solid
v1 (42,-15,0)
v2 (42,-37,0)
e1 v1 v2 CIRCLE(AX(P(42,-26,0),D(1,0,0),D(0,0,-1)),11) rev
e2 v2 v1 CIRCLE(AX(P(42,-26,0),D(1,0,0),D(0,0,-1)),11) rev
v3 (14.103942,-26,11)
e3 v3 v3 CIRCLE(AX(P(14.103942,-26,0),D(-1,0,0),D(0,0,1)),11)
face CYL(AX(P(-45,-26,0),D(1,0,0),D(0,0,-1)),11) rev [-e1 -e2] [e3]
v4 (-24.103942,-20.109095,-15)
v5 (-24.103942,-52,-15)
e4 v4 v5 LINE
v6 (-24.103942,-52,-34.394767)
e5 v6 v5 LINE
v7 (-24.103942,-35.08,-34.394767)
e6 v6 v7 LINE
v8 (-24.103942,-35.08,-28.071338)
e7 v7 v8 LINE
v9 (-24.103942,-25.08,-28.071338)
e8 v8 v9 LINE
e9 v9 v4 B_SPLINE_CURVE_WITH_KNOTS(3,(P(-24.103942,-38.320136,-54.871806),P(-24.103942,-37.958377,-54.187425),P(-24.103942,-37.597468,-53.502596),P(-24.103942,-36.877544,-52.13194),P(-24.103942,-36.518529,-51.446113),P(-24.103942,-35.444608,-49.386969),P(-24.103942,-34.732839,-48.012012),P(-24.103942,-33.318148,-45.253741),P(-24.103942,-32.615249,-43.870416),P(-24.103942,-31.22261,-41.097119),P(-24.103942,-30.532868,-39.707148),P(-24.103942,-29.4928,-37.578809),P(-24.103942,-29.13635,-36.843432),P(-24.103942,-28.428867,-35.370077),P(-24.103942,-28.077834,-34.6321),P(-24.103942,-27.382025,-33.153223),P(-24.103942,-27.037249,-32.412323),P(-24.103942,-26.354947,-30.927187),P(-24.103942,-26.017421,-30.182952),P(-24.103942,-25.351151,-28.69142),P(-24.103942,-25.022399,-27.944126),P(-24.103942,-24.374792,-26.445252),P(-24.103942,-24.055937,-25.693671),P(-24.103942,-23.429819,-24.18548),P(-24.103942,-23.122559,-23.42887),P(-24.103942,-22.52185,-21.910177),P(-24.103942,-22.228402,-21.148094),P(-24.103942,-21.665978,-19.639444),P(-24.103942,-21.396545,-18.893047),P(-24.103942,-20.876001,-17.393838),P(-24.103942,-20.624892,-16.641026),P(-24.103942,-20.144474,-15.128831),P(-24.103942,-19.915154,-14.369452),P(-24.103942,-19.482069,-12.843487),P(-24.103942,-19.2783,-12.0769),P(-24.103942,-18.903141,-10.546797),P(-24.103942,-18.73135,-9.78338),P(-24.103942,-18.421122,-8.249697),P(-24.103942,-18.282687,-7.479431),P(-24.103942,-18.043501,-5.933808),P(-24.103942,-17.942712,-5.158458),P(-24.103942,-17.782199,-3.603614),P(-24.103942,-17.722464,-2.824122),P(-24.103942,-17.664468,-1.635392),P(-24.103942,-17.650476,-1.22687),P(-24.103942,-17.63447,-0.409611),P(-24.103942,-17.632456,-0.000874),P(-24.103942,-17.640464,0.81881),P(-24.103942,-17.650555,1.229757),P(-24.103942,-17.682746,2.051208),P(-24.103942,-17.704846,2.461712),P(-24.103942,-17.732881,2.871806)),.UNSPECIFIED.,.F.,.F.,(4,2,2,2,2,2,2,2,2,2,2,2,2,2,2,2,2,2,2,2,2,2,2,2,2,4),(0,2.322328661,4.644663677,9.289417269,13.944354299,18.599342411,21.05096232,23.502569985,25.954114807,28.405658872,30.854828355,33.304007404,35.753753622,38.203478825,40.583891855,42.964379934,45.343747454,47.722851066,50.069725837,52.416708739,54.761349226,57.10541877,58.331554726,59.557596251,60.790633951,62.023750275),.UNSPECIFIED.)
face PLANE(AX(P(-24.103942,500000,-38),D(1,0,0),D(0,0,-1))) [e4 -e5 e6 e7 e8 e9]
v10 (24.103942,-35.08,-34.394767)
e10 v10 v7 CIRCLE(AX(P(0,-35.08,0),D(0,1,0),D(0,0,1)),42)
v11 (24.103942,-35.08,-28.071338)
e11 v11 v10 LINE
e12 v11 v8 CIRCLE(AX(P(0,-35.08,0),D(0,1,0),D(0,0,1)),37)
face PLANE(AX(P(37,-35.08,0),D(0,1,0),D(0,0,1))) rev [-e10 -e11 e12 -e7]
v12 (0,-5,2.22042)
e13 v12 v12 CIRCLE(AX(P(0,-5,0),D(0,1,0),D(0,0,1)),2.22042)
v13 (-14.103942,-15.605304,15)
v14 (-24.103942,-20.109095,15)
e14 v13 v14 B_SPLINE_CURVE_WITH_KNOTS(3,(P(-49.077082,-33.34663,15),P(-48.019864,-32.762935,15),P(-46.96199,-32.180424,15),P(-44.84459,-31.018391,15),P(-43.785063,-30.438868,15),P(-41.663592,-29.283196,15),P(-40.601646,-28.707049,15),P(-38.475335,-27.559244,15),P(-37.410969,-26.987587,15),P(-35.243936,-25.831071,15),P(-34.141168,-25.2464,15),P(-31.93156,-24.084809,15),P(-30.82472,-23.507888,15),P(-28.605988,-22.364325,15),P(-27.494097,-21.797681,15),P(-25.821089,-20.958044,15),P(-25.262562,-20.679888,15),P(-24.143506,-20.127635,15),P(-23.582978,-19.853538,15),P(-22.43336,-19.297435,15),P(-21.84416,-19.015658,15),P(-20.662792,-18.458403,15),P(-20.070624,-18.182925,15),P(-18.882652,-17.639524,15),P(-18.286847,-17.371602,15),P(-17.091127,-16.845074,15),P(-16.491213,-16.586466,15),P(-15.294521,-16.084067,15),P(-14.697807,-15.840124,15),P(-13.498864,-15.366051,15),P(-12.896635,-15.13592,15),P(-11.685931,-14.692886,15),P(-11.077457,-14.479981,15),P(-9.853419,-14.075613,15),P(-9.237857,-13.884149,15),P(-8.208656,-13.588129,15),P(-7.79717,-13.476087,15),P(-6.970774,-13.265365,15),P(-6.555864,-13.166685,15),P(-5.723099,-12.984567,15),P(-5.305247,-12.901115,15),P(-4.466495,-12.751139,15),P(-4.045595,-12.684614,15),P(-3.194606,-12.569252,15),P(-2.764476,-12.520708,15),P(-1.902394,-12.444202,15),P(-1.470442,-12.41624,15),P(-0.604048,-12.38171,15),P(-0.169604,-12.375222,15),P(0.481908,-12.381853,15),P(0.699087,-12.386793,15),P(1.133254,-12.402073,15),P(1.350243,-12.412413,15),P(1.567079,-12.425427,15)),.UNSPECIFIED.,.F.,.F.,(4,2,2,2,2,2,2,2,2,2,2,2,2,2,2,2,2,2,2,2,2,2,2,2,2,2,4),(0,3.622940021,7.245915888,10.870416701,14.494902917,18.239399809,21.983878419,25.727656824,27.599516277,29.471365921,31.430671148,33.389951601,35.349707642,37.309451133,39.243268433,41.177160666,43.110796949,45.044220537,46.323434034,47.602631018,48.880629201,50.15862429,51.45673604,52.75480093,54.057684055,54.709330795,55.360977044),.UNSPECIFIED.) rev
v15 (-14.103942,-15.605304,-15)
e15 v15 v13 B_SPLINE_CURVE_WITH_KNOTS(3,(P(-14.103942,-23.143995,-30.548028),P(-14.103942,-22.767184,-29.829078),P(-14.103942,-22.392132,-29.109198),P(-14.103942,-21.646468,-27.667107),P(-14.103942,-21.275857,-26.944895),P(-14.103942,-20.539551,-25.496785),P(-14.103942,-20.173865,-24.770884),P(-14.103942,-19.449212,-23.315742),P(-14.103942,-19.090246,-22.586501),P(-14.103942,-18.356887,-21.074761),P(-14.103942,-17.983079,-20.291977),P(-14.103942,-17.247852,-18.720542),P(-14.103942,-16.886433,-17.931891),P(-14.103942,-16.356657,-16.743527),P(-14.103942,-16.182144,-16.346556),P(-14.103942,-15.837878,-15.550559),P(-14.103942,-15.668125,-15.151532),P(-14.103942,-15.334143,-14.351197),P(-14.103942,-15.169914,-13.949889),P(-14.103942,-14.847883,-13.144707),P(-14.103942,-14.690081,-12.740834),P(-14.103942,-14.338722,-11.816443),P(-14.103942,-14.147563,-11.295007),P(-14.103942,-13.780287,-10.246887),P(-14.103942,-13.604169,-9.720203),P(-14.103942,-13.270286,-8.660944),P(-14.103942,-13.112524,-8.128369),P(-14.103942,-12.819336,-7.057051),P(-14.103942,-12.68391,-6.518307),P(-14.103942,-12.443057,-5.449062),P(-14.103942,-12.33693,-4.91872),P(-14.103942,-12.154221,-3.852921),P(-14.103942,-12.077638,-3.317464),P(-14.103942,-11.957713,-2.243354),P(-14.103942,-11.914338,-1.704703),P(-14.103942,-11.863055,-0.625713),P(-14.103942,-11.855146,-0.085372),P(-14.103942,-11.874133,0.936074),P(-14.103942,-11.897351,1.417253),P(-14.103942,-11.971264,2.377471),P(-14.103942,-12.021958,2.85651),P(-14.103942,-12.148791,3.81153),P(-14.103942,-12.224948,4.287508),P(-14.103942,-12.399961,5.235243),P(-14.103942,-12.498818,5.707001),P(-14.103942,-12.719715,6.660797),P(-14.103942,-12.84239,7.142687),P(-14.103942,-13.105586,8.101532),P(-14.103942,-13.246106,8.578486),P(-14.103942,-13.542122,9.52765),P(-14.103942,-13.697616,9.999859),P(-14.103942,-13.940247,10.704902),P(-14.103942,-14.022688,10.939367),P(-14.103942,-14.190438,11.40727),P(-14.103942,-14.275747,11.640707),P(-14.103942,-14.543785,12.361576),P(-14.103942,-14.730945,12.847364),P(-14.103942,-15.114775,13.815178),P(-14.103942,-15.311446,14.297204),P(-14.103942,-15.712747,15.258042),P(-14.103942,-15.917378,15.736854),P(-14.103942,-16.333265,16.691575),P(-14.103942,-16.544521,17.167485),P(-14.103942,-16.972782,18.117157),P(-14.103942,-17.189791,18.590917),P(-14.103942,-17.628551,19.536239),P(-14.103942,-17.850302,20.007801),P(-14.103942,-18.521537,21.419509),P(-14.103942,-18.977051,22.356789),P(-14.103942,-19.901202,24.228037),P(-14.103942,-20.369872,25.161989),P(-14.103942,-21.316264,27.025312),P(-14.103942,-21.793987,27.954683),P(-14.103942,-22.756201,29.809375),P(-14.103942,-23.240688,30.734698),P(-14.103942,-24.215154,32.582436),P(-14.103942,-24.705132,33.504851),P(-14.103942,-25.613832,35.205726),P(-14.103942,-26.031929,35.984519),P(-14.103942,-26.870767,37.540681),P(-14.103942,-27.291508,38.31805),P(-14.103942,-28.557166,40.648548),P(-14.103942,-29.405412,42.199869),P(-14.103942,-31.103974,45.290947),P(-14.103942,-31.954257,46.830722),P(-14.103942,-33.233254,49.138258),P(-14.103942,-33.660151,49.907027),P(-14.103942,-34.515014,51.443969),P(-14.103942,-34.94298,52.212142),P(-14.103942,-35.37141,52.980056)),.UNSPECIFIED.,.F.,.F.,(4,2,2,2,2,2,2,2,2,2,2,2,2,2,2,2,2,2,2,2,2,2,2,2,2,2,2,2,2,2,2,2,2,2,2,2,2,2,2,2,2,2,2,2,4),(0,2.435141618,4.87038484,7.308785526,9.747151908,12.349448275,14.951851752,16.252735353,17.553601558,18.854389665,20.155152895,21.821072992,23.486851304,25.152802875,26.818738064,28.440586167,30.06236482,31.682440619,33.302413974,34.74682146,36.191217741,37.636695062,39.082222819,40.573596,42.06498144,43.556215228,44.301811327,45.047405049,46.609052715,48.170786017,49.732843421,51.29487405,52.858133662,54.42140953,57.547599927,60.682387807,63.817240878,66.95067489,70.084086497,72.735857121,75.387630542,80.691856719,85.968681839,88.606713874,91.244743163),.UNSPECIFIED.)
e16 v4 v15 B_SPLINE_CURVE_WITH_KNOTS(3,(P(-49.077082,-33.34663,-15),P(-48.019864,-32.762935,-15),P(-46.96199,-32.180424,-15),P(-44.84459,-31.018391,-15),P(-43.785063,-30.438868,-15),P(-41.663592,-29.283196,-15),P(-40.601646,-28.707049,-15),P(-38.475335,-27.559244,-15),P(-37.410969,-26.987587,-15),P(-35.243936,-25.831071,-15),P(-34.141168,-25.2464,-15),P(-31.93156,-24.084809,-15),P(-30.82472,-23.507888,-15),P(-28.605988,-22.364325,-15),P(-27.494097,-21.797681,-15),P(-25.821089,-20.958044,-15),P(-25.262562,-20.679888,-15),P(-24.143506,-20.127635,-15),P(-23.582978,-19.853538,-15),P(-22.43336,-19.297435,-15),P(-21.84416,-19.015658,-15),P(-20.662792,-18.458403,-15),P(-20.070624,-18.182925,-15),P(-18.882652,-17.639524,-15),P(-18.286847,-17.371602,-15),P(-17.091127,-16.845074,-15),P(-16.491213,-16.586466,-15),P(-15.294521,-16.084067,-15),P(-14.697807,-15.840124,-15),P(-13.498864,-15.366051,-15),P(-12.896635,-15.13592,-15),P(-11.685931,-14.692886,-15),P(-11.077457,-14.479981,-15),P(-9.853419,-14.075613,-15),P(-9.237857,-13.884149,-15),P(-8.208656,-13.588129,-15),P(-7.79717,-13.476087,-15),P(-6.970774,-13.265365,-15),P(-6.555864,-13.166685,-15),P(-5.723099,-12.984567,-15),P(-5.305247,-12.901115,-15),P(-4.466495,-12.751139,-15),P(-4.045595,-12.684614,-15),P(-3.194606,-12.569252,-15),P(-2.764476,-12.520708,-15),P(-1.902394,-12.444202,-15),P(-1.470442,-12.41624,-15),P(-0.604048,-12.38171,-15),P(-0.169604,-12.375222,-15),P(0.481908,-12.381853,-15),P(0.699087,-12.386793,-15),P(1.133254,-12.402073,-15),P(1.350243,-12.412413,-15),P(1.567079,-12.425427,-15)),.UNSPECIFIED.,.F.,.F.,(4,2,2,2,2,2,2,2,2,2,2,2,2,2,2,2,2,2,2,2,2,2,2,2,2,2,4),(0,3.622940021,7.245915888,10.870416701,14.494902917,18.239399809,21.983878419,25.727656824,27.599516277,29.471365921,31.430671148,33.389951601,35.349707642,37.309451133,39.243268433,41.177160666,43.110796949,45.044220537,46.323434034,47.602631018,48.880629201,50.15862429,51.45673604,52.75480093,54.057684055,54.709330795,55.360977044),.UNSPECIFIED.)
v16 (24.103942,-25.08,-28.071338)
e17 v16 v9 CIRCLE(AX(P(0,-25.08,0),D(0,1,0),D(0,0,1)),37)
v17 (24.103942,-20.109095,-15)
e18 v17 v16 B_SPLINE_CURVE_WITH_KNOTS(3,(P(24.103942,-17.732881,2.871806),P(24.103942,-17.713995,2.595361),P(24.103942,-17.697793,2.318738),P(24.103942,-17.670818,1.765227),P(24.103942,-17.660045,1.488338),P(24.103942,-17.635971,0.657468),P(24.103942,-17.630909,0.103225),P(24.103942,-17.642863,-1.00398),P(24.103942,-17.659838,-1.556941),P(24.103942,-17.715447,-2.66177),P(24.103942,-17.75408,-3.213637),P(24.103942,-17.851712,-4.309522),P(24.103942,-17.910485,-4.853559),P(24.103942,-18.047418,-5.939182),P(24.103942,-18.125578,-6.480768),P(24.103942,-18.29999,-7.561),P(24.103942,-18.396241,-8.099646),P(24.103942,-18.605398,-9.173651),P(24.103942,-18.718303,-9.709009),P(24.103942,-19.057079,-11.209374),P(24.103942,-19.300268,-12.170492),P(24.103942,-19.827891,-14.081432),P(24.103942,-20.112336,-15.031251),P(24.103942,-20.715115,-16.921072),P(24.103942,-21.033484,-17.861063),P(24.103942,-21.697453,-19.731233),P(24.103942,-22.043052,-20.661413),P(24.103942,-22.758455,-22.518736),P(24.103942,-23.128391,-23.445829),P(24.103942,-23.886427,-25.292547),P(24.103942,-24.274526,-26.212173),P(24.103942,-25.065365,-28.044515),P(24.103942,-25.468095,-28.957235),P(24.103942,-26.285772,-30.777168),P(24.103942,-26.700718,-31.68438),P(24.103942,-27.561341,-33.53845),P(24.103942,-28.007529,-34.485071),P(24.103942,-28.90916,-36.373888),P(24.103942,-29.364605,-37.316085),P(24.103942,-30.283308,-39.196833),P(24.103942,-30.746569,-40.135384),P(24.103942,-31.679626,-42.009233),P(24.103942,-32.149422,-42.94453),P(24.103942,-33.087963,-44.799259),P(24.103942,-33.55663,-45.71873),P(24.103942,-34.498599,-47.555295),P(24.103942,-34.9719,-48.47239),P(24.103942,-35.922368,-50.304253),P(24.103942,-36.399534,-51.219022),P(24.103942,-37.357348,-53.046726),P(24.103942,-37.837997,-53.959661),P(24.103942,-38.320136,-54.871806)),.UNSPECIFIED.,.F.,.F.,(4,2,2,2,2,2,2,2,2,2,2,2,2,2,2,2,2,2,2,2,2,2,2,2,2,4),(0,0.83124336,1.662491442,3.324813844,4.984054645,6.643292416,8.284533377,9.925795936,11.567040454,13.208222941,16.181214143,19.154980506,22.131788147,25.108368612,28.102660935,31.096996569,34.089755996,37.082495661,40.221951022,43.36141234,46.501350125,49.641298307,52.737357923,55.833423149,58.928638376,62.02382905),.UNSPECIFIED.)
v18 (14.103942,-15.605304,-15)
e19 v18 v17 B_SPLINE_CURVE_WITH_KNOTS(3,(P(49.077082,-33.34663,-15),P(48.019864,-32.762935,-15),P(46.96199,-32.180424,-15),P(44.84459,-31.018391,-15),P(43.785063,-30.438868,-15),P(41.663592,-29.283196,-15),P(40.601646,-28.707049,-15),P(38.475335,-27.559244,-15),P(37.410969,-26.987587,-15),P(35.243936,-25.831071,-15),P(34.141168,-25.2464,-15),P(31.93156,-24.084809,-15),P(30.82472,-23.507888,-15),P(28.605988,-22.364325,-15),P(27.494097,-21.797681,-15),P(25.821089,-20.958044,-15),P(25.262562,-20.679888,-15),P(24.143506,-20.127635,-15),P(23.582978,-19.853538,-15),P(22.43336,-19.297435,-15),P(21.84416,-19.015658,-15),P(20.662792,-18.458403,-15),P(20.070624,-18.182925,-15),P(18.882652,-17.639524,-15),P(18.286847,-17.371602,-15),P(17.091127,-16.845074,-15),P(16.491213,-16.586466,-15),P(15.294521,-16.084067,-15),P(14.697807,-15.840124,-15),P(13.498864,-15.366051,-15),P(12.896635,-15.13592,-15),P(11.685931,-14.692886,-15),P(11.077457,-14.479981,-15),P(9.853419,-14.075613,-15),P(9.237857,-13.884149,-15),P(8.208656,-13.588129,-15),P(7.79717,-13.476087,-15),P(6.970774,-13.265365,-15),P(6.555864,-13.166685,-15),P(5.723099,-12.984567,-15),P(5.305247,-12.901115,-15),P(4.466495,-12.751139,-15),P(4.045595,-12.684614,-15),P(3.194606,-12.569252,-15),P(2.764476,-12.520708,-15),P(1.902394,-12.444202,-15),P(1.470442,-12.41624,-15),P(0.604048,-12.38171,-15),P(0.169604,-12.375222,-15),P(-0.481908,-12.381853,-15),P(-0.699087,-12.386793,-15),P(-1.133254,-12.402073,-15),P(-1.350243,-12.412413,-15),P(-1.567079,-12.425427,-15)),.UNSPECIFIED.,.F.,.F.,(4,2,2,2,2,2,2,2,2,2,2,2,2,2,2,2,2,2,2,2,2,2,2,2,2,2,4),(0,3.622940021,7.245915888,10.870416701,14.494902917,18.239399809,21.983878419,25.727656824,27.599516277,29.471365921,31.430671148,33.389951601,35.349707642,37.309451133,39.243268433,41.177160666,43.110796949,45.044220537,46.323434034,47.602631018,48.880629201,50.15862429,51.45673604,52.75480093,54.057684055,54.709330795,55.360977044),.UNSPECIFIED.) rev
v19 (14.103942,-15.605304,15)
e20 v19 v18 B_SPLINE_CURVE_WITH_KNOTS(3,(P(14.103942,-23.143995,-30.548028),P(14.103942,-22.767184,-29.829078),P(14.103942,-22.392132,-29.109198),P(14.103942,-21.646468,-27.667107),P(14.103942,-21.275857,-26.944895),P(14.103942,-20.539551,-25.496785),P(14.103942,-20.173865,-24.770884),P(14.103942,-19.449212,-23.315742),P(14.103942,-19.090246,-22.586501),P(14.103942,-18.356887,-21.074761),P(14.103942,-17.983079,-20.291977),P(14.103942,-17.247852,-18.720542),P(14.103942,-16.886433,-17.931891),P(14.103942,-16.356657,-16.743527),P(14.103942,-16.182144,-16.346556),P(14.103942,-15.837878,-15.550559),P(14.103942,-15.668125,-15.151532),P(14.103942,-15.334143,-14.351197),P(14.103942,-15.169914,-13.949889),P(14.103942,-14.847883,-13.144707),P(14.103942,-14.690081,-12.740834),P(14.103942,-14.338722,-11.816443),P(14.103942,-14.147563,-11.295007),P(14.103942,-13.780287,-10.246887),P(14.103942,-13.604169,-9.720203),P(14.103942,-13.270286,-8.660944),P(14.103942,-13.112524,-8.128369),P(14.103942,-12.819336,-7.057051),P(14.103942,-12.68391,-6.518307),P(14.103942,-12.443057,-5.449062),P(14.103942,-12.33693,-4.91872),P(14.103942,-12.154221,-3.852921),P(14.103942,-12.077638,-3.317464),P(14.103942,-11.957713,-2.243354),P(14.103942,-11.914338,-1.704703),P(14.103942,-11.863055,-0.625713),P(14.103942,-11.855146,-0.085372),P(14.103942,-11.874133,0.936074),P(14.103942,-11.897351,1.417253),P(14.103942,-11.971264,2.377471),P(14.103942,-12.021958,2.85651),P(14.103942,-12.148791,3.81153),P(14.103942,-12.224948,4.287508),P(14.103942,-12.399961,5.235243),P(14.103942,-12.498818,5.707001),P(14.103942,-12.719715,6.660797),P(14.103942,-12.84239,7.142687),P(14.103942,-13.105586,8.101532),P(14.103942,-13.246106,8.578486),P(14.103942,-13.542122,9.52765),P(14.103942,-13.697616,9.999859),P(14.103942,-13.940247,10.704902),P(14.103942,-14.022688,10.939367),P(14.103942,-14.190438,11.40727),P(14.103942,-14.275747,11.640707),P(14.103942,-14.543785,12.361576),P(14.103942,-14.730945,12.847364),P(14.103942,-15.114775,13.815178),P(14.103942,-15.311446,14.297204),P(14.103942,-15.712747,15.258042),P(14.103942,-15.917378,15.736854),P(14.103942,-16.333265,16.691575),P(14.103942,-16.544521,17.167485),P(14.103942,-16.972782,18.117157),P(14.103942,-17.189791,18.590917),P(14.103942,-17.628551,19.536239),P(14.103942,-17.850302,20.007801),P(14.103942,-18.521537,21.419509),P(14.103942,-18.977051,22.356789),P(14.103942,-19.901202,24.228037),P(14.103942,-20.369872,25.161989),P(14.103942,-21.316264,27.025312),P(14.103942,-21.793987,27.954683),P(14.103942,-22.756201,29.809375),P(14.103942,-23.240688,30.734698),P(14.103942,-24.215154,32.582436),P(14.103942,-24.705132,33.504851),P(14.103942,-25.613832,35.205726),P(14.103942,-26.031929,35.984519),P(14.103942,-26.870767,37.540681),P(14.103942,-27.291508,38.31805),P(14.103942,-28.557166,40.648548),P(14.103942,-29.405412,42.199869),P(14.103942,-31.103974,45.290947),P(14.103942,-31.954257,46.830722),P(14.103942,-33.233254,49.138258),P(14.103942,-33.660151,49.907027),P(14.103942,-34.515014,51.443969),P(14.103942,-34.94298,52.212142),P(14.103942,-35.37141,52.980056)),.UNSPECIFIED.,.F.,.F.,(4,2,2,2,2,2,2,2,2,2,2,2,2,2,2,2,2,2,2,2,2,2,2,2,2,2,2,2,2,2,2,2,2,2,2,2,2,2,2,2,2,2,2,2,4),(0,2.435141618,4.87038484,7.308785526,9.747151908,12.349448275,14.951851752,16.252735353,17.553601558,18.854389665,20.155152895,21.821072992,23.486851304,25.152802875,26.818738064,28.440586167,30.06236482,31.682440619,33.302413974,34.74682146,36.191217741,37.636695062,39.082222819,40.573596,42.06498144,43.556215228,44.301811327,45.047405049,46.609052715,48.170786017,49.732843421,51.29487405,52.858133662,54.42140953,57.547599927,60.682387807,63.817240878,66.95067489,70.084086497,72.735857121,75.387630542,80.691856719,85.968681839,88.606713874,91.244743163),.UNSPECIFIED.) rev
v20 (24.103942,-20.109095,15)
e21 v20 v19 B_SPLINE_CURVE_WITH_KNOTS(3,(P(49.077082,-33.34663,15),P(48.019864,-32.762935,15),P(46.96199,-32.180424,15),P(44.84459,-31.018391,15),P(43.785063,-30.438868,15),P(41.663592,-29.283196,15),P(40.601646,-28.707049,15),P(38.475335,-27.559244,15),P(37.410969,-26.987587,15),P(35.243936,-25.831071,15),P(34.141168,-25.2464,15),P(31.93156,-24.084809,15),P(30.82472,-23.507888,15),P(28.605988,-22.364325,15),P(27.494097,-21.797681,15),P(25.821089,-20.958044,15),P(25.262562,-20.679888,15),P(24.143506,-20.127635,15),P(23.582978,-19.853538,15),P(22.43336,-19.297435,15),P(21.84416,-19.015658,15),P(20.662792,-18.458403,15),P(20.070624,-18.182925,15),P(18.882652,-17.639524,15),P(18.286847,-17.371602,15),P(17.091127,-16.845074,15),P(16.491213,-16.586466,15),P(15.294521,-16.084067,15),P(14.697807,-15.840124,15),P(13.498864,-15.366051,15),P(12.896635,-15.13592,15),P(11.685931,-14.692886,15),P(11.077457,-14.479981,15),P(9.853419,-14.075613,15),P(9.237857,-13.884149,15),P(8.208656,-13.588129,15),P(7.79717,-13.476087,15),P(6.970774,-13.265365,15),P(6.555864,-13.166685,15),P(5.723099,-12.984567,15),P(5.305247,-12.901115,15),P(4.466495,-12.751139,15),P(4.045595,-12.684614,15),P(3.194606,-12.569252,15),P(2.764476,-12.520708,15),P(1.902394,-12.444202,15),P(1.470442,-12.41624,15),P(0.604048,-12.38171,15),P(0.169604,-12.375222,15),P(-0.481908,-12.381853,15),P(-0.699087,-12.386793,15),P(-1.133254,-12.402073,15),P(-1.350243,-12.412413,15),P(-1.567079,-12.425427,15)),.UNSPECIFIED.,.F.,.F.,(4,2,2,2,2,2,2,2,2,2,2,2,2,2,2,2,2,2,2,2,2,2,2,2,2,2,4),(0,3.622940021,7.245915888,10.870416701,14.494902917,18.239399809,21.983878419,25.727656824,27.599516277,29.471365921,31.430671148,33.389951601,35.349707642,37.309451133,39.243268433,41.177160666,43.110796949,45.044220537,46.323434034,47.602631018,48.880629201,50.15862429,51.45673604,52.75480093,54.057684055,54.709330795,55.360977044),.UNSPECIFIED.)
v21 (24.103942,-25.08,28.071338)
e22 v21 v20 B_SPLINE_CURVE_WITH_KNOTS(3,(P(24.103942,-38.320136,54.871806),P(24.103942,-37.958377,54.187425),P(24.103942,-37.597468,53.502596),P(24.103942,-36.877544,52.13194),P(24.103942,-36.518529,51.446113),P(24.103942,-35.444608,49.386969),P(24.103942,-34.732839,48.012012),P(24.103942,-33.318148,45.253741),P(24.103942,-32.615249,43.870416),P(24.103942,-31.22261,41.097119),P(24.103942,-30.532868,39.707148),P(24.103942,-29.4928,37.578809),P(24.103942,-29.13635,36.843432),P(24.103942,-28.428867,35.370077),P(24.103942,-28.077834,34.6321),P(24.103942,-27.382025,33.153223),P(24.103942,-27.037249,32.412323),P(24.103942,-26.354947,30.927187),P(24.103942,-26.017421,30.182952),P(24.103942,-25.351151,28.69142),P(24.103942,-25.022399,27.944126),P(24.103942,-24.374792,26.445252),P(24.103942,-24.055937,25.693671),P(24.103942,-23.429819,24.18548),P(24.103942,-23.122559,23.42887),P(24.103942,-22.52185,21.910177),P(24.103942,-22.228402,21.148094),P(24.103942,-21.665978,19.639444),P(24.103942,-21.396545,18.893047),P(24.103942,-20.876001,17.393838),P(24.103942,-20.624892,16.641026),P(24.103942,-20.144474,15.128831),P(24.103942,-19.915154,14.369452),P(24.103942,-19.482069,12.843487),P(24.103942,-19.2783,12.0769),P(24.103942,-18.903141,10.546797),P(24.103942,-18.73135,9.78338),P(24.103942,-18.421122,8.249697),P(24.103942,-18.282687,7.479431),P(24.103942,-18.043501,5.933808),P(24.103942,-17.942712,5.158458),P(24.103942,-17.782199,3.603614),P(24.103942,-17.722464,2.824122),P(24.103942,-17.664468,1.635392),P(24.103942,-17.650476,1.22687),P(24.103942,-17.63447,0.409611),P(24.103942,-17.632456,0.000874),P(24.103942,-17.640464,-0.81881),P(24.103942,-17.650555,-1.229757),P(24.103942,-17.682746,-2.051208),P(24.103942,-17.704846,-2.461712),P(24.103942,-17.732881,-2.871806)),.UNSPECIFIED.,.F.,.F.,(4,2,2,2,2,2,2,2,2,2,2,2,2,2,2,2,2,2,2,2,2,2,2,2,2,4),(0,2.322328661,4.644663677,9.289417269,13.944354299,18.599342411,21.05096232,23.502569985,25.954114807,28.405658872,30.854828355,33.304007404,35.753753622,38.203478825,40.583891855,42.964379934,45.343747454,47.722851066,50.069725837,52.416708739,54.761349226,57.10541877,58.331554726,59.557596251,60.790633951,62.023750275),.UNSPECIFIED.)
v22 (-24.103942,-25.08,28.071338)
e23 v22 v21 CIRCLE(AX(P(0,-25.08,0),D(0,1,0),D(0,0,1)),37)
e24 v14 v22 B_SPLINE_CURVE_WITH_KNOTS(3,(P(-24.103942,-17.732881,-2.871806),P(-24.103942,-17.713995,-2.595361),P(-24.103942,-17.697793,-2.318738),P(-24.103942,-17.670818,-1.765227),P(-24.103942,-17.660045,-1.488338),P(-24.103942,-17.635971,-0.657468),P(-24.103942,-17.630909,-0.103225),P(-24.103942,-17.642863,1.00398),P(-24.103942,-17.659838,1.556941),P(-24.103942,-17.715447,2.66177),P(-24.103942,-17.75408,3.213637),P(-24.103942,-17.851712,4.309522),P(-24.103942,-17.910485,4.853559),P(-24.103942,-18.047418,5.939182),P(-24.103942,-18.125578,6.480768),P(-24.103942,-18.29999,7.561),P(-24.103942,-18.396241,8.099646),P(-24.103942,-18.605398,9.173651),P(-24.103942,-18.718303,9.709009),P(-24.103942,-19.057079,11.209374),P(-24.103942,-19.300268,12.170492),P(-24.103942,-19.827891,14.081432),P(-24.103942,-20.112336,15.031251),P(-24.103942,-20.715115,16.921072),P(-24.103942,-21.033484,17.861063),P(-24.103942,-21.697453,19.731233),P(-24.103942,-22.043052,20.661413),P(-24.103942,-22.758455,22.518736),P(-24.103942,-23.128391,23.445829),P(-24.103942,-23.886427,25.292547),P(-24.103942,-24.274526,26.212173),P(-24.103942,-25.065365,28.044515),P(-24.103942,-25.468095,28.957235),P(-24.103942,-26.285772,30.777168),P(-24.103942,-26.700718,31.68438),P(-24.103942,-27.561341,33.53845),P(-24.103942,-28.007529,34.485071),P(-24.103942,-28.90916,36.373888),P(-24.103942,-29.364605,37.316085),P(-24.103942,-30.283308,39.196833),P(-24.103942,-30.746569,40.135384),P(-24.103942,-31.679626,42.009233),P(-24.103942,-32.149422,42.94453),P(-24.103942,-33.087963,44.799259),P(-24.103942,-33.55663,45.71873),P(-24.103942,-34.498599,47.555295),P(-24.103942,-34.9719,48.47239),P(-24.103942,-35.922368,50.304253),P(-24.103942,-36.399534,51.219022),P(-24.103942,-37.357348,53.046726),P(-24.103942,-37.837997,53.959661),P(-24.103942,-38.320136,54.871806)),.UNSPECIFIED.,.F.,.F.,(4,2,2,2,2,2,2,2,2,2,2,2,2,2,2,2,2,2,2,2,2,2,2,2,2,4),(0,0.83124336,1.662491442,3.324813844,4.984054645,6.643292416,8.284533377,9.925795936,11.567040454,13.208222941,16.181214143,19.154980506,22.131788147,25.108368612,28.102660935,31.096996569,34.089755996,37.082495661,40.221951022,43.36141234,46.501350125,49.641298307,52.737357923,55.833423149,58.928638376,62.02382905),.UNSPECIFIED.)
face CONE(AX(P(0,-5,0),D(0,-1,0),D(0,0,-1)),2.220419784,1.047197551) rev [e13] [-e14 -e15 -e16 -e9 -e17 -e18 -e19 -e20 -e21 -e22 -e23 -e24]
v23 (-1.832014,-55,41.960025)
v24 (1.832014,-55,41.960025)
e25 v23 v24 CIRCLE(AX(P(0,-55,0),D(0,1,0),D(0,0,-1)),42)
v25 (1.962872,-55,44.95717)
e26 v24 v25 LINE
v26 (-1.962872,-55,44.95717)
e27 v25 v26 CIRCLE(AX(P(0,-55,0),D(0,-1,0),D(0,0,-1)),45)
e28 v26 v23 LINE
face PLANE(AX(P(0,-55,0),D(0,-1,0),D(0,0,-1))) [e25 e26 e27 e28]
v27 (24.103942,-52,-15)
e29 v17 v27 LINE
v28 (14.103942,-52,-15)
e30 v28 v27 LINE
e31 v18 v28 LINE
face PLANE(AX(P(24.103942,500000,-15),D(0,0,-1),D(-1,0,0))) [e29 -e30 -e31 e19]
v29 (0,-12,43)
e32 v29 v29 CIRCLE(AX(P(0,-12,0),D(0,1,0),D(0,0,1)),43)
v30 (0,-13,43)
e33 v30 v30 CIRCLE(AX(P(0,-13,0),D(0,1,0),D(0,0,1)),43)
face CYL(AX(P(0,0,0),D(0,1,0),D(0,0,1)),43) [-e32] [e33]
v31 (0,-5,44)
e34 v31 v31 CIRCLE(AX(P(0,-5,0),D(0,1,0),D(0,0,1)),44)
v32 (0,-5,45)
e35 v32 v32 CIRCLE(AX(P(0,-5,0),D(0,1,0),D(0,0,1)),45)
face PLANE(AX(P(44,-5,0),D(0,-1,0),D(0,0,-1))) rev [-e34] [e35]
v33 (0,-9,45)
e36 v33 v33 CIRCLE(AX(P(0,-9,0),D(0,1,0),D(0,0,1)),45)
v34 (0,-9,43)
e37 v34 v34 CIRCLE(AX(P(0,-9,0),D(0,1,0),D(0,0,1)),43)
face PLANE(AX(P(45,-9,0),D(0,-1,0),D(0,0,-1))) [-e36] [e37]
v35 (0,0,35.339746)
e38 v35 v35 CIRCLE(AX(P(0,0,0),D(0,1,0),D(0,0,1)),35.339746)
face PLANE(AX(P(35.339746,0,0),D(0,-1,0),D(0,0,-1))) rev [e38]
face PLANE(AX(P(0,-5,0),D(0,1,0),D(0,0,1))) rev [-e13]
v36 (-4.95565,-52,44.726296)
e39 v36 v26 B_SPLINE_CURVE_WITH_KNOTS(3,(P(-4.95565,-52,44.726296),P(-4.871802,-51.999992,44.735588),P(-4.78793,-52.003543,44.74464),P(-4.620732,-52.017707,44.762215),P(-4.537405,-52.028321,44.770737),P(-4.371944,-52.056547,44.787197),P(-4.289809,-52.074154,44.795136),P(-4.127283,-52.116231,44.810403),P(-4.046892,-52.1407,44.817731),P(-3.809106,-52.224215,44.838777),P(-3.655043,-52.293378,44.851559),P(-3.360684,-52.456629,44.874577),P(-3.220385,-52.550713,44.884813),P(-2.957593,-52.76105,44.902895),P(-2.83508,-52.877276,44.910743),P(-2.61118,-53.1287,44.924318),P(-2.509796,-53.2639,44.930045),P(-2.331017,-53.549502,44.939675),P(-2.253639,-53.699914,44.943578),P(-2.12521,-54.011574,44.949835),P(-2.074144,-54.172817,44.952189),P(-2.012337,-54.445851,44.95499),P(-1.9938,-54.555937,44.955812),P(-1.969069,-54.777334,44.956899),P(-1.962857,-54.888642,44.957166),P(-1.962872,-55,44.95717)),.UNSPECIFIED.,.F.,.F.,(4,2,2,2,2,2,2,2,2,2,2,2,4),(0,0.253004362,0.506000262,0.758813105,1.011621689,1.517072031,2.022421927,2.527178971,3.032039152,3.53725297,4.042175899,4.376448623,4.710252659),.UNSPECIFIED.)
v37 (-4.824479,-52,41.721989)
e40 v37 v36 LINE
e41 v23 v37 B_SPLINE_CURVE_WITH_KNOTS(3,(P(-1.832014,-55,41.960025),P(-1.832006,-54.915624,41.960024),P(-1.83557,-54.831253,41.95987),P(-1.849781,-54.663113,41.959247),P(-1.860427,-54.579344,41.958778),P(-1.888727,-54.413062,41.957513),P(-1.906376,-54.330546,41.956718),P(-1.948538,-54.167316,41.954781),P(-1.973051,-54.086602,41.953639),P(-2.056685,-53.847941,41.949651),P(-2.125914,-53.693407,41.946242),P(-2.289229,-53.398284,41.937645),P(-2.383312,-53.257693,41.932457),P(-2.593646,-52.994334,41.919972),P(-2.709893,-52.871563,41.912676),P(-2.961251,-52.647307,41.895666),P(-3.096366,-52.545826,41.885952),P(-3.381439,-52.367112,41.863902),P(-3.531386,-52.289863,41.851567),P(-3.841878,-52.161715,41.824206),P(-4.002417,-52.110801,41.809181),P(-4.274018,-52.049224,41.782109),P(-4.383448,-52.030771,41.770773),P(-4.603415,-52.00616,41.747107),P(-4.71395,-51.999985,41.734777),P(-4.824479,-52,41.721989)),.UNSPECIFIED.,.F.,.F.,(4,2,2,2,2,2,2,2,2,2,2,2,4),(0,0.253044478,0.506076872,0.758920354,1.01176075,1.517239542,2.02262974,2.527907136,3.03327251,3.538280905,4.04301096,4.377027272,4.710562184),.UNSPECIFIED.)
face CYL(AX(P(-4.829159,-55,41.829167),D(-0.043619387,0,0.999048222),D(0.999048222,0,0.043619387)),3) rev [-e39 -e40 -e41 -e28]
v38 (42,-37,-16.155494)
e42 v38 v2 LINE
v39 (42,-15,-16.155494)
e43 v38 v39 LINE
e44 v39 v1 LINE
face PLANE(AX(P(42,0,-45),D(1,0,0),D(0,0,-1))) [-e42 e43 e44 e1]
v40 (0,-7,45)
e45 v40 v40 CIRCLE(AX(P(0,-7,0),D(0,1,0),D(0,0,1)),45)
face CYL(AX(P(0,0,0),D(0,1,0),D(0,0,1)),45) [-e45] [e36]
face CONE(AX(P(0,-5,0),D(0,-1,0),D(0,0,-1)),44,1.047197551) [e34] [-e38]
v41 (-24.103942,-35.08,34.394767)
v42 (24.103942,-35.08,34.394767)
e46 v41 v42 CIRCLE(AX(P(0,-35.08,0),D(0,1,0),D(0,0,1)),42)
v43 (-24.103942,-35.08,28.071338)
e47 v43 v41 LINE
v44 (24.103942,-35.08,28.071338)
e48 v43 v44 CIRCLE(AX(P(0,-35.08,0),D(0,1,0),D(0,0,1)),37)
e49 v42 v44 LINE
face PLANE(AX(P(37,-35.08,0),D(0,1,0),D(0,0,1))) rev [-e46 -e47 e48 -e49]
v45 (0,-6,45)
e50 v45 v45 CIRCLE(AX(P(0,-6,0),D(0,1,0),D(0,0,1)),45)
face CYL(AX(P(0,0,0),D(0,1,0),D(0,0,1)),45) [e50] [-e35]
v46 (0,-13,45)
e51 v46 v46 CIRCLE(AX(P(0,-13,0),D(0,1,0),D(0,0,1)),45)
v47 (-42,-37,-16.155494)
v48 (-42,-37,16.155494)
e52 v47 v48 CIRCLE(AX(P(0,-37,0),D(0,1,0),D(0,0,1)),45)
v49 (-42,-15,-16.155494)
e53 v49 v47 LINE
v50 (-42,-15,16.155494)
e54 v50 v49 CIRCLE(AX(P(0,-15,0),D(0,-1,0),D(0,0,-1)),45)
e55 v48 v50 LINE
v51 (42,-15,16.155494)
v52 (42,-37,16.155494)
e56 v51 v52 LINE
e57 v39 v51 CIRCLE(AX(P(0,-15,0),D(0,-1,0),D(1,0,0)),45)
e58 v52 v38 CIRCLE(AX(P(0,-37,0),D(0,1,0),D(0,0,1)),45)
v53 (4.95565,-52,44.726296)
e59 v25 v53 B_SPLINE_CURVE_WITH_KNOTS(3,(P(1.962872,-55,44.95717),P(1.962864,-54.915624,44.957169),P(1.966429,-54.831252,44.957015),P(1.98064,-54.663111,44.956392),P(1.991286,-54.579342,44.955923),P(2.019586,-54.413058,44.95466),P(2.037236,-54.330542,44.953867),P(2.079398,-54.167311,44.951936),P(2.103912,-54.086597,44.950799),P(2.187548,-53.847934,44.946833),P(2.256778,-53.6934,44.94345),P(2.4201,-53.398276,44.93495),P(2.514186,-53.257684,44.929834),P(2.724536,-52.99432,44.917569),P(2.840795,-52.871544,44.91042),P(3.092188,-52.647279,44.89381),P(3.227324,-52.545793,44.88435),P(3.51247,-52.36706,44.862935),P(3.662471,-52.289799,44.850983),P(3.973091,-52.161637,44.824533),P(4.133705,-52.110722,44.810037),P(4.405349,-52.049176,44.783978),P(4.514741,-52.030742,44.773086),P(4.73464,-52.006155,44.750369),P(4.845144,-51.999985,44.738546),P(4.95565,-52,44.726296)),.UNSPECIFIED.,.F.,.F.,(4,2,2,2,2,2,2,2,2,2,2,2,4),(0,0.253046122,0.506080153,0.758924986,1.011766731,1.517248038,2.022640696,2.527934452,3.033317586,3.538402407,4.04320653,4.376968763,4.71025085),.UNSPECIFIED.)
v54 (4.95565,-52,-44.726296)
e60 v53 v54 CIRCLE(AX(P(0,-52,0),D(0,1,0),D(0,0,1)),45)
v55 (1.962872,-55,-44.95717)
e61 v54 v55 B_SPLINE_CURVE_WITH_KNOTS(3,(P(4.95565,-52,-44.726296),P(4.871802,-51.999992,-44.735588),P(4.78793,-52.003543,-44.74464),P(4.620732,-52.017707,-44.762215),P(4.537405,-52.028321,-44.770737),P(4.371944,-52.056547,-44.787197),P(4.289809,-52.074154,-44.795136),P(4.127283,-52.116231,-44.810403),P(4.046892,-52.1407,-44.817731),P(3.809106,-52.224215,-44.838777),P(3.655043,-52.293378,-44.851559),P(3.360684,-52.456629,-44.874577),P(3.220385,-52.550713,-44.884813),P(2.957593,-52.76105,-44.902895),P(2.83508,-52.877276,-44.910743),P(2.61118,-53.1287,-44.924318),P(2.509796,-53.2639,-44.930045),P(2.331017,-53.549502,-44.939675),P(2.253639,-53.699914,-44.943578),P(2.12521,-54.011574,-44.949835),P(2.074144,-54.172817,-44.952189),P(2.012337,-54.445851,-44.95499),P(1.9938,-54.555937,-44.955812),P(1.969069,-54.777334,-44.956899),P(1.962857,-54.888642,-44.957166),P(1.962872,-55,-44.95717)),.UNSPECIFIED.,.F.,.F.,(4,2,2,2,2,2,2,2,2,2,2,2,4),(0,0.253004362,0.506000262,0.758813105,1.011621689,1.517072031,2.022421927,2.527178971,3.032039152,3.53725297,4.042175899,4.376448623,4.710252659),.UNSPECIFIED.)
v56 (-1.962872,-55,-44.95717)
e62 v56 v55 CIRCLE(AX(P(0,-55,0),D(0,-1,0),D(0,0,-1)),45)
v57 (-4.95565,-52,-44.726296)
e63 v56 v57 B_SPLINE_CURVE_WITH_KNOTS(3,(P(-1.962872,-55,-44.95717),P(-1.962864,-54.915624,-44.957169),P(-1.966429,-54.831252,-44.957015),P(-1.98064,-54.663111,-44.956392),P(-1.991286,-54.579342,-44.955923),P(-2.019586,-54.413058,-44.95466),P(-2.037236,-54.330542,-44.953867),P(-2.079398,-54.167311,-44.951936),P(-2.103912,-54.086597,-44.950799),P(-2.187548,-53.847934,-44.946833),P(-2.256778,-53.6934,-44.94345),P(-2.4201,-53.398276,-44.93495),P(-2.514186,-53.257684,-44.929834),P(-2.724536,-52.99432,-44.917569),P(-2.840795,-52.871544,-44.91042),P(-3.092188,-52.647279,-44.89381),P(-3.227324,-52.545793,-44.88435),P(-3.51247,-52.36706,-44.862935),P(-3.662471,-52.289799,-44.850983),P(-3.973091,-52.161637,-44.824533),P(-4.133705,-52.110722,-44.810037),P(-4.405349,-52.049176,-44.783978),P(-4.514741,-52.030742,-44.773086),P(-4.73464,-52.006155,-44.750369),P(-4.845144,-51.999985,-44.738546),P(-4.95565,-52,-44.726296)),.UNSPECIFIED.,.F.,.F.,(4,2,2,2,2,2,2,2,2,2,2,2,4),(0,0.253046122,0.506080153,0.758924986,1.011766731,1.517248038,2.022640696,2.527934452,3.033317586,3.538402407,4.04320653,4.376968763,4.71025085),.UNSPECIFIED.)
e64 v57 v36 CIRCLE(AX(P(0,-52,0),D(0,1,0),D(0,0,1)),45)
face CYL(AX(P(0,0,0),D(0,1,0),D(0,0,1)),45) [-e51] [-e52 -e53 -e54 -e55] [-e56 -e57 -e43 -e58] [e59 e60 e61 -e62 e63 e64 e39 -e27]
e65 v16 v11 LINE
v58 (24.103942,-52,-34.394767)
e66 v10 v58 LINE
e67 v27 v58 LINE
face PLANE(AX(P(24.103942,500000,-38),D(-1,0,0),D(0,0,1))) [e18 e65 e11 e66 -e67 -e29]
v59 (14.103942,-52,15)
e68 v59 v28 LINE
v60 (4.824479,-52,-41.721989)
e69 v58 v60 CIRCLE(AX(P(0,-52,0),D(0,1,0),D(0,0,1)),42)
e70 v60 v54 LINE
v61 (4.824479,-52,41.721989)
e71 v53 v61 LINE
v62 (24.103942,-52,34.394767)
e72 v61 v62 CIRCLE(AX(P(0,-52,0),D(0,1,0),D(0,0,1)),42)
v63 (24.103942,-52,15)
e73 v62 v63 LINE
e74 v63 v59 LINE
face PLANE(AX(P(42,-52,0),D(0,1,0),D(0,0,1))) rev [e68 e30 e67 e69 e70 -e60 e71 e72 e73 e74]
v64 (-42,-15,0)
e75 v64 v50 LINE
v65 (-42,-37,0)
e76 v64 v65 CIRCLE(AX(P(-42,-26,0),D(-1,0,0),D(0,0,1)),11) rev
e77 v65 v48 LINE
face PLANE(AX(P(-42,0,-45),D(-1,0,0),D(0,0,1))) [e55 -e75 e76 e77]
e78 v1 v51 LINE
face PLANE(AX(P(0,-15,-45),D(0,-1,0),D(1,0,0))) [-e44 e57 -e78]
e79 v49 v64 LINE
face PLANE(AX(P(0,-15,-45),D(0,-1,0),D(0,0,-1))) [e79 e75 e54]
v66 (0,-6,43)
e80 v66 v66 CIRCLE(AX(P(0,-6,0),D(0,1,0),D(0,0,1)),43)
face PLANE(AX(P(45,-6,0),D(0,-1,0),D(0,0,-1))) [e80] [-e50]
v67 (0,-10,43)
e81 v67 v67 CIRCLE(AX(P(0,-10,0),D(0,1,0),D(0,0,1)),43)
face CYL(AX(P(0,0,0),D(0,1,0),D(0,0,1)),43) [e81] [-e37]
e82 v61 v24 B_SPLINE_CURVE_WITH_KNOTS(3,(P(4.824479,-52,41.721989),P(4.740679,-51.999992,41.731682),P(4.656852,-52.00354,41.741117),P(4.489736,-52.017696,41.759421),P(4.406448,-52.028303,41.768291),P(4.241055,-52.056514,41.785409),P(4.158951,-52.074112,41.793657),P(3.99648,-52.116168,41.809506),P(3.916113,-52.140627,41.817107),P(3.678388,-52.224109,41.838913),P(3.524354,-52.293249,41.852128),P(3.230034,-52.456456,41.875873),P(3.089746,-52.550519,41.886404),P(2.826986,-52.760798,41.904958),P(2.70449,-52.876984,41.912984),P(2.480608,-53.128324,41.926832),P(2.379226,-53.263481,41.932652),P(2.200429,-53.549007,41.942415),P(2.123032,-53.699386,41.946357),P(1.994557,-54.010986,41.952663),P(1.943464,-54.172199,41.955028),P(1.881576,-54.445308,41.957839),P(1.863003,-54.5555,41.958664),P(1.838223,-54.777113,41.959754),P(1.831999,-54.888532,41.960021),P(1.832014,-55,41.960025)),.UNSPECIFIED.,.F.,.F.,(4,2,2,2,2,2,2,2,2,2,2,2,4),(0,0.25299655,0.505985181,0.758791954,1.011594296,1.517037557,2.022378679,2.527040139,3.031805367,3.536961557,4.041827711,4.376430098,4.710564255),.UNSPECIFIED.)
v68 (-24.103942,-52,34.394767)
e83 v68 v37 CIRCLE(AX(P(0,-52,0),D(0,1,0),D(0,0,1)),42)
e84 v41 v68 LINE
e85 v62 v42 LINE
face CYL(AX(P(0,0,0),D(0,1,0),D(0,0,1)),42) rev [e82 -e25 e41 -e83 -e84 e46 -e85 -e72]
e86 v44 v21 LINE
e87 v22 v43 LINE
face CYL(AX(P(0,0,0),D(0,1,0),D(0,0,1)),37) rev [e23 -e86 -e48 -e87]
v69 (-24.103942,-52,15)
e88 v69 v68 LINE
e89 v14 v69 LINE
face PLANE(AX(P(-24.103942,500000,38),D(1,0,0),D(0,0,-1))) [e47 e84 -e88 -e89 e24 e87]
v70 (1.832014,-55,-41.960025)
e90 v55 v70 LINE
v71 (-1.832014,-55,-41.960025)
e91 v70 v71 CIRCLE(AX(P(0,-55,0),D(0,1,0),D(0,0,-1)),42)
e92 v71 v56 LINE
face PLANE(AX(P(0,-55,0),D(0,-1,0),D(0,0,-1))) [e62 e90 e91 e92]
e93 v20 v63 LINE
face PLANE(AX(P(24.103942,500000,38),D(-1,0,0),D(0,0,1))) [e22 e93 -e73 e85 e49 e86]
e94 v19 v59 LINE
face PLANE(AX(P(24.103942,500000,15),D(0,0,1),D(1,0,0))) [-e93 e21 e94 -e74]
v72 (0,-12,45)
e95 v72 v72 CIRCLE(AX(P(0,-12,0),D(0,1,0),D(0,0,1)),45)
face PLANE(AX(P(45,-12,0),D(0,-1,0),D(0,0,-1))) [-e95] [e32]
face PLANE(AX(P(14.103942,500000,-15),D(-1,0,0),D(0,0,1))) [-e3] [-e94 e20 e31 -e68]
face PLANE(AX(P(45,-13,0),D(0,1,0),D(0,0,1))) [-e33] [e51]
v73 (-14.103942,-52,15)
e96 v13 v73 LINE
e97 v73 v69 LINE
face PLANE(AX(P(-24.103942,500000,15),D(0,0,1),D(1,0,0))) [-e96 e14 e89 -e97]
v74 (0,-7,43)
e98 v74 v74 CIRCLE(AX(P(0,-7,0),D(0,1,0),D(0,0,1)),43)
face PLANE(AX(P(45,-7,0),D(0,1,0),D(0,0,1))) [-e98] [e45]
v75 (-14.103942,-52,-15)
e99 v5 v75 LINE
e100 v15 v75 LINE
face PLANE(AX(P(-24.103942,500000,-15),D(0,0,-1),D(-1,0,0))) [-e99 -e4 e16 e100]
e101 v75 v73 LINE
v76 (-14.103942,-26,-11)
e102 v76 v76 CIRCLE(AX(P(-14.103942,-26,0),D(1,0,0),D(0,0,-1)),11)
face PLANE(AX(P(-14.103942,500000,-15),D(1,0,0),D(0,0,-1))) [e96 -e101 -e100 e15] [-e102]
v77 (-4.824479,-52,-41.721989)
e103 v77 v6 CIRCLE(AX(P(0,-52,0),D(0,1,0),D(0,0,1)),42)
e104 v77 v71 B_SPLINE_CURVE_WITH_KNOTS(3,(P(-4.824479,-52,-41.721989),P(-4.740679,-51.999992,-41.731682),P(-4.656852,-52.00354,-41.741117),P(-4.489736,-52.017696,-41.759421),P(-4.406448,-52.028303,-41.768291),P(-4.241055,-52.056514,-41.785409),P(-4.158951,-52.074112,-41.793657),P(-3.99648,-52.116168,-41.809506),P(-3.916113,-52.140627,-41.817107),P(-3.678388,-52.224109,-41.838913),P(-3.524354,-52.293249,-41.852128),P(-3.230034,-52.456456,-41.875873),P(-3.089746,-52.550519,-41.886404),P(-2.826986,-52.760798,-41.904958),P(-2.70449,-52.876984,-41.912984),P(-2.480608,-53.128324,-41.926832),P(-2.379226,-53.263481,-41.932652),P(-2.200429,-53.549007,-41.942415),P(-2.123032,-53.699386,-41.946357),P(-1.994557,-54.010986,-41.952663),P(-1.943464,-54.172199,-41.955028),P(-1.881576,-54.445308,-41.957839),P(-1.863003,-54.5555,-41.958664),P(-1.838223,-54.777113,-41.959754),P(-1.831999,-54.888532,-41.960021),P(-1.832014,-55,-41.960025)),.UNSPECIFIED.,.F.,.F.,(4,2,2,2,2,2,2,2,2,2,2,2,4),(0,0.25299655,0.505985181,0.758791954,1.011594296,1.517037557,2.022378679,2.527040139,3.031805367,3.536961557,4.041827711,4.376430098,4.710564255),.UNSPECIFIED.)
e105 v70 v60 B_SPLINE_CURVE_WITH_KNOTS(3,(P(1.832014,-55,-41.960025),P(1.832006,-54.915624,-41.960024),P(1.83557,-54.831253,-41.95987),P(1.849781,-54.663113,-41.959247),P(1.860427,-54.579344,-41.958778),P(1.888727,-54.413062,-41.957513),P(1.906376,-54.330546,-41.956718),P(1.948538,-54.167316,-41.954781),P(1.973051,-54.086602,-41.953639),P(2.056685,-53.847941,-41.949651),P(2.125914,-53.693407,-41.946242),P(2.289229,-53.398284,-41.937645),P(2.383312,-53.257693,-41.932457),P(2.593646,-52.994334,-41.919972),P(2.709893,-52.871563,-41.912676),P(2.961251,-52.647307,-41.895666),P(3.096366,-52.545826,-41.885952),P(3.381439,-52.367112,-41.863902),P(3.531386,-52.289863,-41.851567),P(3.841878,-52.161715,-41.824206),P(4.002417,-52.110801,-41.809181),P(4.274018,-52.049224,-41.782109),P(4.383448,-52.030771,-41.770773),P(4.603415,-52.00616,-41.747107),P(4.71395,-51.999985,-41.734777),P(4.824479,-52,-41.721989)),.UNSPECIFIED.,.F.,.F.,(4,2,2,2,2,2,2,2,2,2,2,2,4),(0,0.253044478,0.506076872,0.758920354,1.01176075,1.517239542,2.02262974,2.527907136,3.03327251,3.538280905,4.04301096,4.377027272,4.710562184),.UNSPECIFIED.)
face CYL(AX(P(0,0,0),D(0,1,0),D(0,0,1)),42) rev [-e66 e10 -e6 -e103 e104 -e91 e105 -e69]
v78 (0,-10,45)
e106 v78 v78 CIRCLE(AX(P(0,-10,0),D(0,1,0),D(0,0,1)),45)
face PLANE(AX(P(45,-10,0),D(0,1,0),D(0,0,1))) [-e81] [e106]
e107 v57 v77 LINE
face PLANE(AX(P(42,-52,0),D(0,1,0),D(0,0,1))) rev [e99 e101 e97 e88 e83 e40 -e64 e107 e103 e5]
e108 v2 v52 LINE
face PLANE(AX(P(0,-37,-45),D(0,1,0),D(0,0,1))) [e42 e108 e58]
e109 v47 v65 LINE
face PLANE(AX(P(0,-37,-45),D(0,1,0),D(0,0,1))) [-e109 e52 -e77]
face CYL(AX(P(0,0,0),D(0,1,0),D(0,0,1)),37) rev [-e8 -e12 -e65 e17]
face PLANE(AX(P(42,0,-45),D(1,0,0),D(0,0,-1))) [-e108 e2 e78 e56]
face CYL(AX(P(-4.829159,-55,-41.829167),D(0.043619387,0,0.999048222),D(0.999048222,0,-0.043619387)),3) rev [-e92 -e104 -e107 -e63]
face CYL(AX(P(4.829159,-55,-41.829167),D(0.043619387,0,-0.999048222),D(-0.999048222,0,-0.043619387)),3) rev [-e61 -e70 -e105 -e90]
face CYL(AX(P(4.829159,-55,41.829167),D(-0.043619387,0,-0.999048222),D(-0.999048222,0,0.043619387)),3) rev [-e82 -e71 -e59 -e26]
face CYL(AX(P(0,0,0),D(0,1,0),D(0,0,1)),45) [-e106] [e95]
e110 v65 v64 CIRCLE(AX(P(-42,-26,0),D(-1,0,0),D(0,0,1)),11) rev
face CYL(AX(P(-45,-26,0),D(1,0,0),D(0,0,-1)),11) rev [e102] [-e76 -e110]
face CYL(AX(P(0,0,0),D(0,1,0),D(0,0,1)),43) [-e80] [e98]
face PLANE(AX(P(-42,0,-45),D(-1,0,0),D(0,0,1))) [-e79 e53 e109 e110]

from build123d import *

# Parameters (mm, degrees)
BOSS_EXTRUDE1_REACH     = 84.183
CUT_EXTRUDE1_DEPTH      = 91.676766104
CUT_EXTRUDE1_DEPTH_BACK = 91.676766104
GUDGEON_HOLE_R          = 11
CUT_EXTRUDE2_DEPTH      = 114.265175749
RING_CS_W               = 2
RING_CS_H               = 1
BOSS_EXTRUDE2_DEPTH     = 3
FILLET1_R               = 3


with BuildPart() as part:
    # Piston CS → Revolve1 (revolve)
    with BuildSketch(Plane.XY, mode=Mode.PRIVATE) as revolve1_sk:
        Polygon((0, 0), (0, -5), (2.220419784, -5), (37, -25.08), (37, -35.08), (42, -35.08), (42, -52), (45, -52), (45, -5), (44, -5), (35.339745962, 0), align=None)
    revolve(revolve1_sk.sketch.rotate(Axis((0, 0, 0), (0, -1, 0)), 90), axis=Axis((0, 0, 0), (0, -1, 0)))

    # Sketch5 → Boss-Extrude1 (add, up to next)
    with BuildSketch(Plane.XZ.offset(52), mode=Mode.PRIVATE) as boss_extrude1_sk1:
        with BuildLine():
            Line((-24.103941586, -38), (-24.103941586, -15))
            Line((-24.103941586, -15), (-14.103941586, -15))
            Line((-14.103941586, -15), (-14.103941586, 15))
            Line((-14.103941586, 15), (-24.103941586, 15))
            Line((-24.103941586, 15), (-24.103941586, 38))
            ThreePointArc((-24.103941586, 38), (-45, 0), (-24.103941586, -38))
        make_face()
    boss_extrude1_tool1 = extrude(boss_extrude1_sk1.sketch, amount=-BOSS_EXTRUDE1_REACH, mode=Mode.PRIVATE) - part.part
    # Sketch5 → Boss-Extrude1 (add, up to next)
    with BuildSketch(Plane.XZ.offset(52), mode=Mode.PRIVATE) as boss_extrude1_sk2:
        with BuildLine():
            Line((24.103941586, 38), (24.103941586, 15))
            Line((24.103941586, 15), (14.103941586, 15))
            Line((14.103941586, 15), (14.103941586, -15))
            Line((14.103941586, -15), (24.103941586, -15))
            Line((24.103941586, -15), (24.103941586, -38))
            ThreePointArc((24.103941586, -38), (45, 0), (24.103941586, 38))
        make_face()
    boss_extrude1_tool2 = extrude(boss_extrude1_sk2.sketch, amount=-BOSS_EXTRUDE1_REACH, mode=Mode.PRIVATE) - part.part
    add(boss_extrude1_tool1.solids().sort_by_distance((-29.792455, -52, 0))[0])
    add(boss_extrude1_tool2.solids().sort_by_distance((29.792455, -52, 0))[0])

    # Gudgeon Hole → Cut-Extrude1 (cut, two sides: drawn at the far end of the back side and taken through both)
    with BuildSketch(Plane(origin=(-14.103941586, 0, 0), x_dir=(0, 0, -1), z_dir=(1, 0, 0)).offset(-CUT_EXTRUDE1_DEPTH_BACK)):
        with Locations((0, -26)):
            Circle(GUDGEON_HOLE_R)
    extrude(amount=CUT_EXTRUDE1_DEPTH + CUT_EXTRUDE1_DEPTH_BACK, mode=Mode.SUBTRACT)

    # Gudgeon Hole Cutouts → Cut-Extrude2 (cut, through all)
    with BuildSketch(Plane.XY.offset(45)):
        with BuildLine():
            Line((-42, -15), (-45, -15))
            add(Edge.make_bspline(
                [(-45, -15), (-42.311111111, -26), (-45, -37)],
                knots=[0, 0, 0, 1, 1, 1], degree=2, weights=[0.034, 0.045, 0.056]))
            Line((-45, -37), (-42, -37))
            Line((-42, -37), (-42, -15))
        make_face()
        with BuildLine():
            Line((42, -37), (45, -37))
            add(Edge.make_bspline(
                [(45, -37), (42.311111111, -26), (45, -15)],
                knots=[0, 0, 0, 1, 1, 1], degree=2, weights=[0.034, 0.045, 0.056]))
            Line((45, -15), (42, -15))
            Line((42, -15), (42, -37))
        make_face()
    extrude(amount=-CUT_EXTRUDE2_DEPTH, mode=Mode.SUBTRACT)

    # Ring CS → Cut-Revolve1 (revolve, cut)
    with BuildSketch(Plane.XY, mode=Mode.PRIVATE) as cut_revolve1_sk:
        with Locations((44, -6.5)):
            Rectangle(RING_CS_W, RING_CS_H)
        with Locations((44, -9.5)):
            Rectangle(RING_CS_W, RING_CS_H)
        with Locations((44, -12.5)):
            Rectangle(RING_CS_W, RING_CS_H)
    revolve(cut_revolve1_sk.sketch.rotate(Axis((0, 0, 0), (0, -1, 0)), 90), axis=Axis((0, 0, 0), (0, -1, 0)), mode=Mode.SUBTRACT)

    # Sketch9 → Boss-Extrude2 (add)
    with BuildSketch(Plane.XZ.offset(52)):
        with BuildLine():
            Line((-1.832014269, 41.960025306), (-1.962872431, 44.957169971))
            ThreePointArc((-1.962872431, 44.957169971), (0, 45), (1.962872431, 44.957169971))
            Line((1.962872431, 44.957169971), (1.832014269, 41.960025306))
            ThreePointArc((1.832014269, 41.960025306), (0, 42), (-1.832014269, 41.960025306))
        make_face()
        with BuildLine():
            Line((1.832014269, -41.960025306), (1.962872431, -44.957169971))
            ThreePointArc((1.962872431, -44.957169971), (0, -45), (-1.962872431, -44.957169971))
            Line((-1.962872431, -44.957169971), (-1.832014269, -41.960025306))
            ThreePointArc((-1.832014269, -41.960025306), (0, -42), (1.832014269, -41.960025306))
        make_face()
    extrude(amount=BOSS_EXTRUDE2_DEPTH)

    # Fillet1
    # the kernel refuses this fillet: 3 mm, written as the material it adds along each edge
    with BuildSketch(Plane(origin=(-1.504868864, -52, 34.467163645), x_dir=(-0.999048221581858, 0, -0.043619387365329124), z_dir=(-0.043619387365329124, 0, 0.9990482215818581))) as fillet1_piece_1_section:
        with BuildLine():
            CenterArc((FILLET1_R, FILLET1_R), FILLET1_R, 180, 90)
            Line((0, FILLET1_R), (0, 0))
            Line((0, 0), (FILLET1_R, 0))
        make_face()
    fillet1_piece_1 = extrude(amount=18, mode=Mode.PRIVATE)
    fillet1_piece_1 = fillet1_piece_1 & Plane(origin=(0, -52.679071729, 0), x_dir=(0, 0, 1), z_dir=(0, 1, 0)) * Cylinder(45, 49, mode=Mode.PRIVATE)
    fillet1_piece_1 = fillet1_piece_1 - Plane(origin=(0, -52.679071729, 0), x_dir=(0, 0, 1), z_dir=(0, -1, 0)) * Cylinder(42, 49, mode=Mode.PRIVATE)
    add(fillet1_piece_1)
    with BuildSketch(Plane(origin=(2.290017837, -52, 52.450031633), x_dir=(0.9990482215818575, 0, -0.04361938736534308), z_dir=(-0.04361938736534308, 0, -0.9990482215818575))) as fillet1_piece_2_section:
        with BuildLine():
            CenterArc((FILLET1_R, FILLET1_R), FILLET1_R, 180, 90)
            Line((0, FILLET1_R), (0, 0))
            Line((0, 0), (FILLET1_R, 0))
        make_face()
    fillet1_piece_2 = extrude(amount=18, mode=Mode.PRIVATE)
    fillet1_piece_2 = fillet1_piece_2 - Plane(origin=(0, -52.679065019, 0), x_dir=(0, 0, 1), z_dir=(0, -1, 0)) * Cylinder(42, 49, mode=Mode.PRIVATE)
    fillet1_piece_2 = fillet1_piece_2 & Plane(origin=(0, -52.679065019, 0), x_dir=(0, 0, 1), z_dir=(0, 1, 0)) * Cylinder(45, 49, mode=Mode.PRIVATE)
    add(fillet1_piece_2)
    with BuildSketch(Plane(origin=(1.504868864, -52, -34.467163645), x_dir=(0.9990482215818575, 0, 0.04361938736534308), z_dir=(0.04361938736534308, 0, -0.9990482215818575))) as fillet1_piece_3_section:
        with BuildLine():
            CenterArc((FILLET1_R, FILLET1_R), FILLET1_R, 180, 90)
            Line((0, FILLET1_R), (0, 0))
            Line((0, 0), (FILLET1_R, 0))
        make_face()
    fillet1_piece_3 = extrude(amount=18, mode=Mode.PRIVATE)
    fillet1_piece_3 = fillet1_piece_3 - Plane(origin=(0, -52.679069886, 0), x_dir=(0, 0, 1), z_dir=(0, -1, 0)) * Cylinder(42, 49, mode=Mode.PRIVATE)
    fillet1_piece_3 = fillet1_piece_3 & Plane(origin=(0, -52.679069886, 0), x_dir=(0, 0, 1), z_dir=(0, 1, 0)) * Cylinder(45, 49, mode=Mode.PRIVATE)
    add(fillet1_piece_3)
    with BuildSketch(Plane(origin=(-2.290017837, -52, -52.450031633), x_dir=(-0.999048221581858, 0, 0.04361938736532913), z_dir=(0.043619387365329124, 0, 0.9990482215818581))) as fillet1_piece_4_section:
        with BuildLine():
            CenterArc((FILLET1_R, FILLET1_R), FILLET1_R, 180, 90)
            Line((0, FILLET1_R), (0, 0))
            Line((0, 0), (FILLET1_R, 0))
        make_face()
    fillet1_piece_4 = extrude(amount=18, mode=Mode.PRIVATE)
    fillet1_piece_4 = fillet1_piece_4 - Plane(origin=(0, -52.679069383, 0), x_dir=(0, 0, 1), z_dir=(0, -1, 0)) * Cylinder(42, 49, mode=Mode.PRIVATE)
    fillet1_piece_4 = fillet1_piece_4 & Plane(origin=(0, -52.679069383, 0), x_dir=(0, 0, 1), z_dir=(0, 1, 0)) * Cylinder(45, 49, mode=Mode.PRIVATE)
    add(fillet1_piece_4)


solid = part.part
